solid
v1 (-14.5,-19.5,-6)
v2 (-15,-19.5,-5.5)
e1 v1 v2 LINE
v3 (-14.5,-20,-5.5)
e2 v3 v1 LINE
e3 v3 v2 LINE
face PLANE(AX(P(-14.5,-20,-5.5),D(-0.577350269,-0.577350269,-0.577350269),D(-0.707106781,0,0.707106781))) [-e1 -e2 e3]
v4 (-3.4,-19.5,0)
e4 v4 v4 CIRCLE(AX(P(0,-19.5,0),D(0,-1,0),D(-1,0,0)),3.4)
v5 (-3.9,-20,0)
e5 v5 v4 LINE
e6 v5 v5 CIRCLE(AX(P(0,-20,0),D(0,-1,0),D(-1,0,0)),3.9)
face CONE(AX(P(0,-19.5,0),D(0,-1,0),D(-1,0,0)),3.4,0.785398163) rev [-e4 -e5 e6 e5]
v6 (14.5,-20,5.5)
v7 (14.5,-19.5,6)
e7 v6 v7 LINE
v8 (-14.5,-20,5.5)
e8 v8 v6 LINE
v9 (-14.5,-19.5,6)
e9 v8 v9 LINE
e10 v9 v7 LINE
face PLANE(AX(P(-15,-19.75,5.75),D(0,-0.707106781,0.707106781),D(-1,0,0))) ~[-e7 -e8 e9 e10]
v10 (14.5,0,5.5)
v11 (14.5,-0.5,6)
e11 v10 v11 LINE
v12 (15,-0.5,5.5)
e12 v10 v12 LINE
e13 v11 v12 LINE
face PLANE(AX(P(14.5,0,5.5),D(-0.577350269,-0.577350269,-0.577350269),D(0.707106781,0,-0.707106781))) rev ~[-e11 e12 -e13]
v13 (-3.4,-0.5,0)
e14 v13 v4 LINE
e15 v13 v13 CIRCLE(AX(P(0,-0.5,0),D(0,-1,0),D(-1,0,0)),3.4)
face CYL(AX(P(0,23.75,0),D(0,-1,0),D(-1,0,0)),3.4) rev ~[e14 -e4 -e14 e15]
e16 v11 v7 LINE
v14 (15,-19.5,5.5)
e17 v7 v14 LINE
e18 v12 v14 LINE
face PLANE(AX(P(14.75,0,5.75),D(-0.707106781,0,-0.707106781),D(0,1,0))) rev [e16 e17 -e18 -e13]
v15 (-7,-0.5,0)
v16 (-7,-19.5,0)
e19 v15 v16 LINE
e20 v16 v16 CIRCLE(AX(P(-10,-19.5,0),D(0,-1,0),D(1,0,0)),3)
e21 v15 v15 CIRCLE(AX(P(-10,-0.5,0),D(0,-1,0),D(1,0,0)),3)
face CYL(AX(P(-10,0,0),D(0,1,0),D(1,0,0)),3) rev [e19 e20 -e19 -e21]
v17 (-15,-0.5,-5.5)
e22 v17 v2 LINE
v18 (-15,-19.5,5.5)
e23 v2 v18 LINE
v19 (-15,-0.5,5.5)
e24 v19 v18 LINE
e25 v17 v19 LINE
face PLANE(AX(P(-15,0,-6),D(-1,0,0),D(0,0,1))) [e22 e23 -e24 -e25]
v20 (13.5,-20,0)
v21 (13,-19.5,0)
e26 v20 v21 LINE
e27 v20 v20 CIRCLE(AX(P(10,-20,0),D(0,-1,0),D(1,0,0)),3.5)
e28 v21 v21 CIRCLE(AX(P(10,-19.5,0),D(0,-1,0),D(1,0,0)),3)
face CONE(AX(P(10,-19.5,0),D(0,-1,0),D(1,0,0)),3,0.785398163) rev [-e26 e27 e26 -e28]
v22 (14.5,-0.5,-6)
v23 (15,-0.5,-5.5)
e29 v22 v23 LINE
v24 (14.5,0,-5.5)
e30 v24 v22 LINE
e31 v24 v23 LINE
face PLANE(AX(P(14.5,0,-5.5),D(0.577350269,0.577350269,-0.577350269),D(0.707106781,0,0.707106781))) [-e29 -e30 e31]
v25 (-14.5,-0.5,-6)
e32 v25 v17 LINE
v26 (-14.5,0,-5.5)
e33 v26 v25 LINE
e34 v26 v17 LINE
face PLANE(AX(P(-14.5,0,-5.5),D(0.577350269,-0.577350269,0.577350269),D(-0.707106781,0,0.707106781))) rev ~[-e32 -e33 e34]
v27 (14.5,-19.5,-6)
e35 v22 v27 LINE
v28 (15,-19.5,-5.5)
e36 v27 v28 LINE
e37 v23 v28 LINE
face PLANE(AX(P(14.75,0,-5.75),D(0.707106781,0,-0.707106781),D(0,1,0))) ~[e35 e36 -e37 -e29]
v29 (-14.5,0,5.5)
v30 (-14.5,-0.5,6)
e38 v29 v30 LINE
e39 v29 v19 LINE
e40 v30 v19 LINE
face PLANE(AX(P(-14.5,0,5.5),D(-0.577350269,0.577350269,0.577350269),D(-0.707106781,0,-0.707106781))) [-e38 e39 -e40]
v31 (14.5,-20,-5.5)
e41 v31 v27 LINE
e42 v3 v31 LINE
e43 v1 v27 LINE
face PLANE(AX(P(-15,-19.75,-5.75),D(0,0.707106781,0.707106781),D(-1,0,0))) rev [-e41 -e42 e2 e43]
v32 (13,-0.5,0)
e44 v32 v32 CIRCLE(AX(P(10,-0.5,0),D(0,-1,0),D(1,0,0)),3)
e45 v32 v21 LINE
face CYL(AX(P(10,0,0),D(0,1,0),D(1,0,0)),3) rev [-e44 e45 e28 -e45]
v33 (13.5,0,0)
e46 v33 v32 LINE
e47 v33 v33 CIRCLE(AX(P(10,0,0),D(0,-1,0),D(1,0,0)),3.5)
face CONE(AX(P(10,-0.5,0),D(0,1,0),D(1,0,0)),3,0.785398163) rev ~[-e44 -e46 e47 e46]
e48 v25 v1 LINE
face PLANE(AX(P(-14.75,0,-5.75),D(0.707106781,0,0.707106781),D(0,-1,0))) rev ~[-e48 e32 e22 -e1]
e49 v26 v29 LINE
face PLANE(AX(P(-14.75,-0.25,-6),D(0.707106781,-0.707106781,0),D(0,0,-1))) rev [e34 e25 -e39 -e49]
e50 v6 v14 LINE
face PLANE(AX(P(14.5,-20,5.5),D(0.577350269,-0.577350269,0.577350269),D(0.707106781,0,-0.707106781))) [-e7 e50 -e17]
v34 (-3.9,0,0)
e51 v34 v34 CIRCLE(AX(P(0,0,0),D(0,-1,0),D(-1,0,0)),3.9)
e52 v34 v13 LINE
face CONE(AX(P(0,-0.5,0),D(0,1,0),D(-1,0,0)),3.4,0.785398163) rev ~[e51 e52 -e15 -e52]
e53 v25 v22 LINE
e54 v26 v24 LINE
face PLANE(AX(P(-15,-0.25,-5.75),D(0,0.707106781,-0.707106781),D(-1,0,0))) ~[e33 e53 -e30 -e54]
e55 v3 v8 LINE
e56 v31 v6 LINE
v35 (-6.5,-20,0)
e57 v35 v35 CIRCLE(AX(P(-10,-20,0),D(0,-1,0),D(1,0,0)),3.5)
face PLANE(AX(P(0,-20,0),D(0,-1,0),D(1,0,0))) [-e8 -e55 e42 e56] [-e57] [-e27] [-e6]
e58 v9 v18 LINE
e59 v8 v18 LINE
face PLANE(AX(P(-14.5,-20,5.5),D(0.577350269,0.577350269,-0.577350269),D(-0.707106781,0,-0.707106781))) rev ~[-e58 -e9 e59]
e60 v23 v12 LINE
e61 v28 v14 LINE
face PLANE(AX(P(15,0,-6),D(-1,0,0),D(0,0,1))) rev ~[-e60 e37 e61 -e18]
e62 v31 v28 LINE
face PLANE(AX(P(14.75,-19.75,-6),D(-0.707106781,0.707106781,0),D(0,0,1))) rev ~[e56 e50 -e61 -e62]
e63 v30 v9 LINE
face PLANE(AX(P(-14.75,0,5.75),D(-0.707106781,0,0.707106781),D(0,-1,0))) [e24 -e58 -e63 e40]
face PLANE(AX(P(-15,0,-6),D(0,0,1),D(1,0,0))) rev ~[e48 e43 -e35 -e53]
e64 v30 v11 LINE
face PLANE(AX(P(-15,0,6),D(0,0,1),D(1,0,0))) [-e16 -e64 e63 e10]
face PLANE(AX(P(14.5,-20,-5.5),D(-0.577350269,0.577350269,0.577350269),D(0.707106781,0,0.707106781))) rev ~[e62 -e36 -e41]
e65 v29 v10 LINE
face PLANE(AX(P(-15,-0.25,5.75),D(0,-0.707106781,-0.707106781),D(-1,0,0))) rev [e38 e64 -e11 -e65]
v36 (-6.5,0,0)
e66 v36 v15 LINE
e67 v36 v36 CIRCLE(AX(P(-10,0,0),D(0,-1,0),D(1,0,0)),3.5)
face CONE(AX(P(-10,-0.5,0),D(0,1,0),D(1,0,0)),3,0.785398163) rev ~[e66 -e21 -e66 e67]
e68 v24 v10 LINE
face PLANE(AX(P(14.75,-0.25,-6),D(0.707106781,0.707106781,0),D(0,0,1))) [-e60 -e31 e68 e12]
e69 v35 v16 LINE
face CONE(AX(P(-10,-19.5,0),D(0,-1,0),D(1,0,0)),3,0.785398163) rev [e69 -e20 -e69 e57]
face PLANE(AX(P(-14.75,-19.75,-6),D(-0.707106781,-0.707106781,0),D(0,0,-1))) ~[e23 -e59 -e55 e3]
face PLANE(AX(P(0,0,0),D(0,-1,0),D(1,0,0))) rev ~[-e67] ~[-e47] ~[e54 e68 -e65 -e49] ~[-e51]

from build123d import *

# Parameters (mm, degrees)
F0_W     = 30
F0_H     = 12
F0_R     = 3
F0_R_2   = 3.4
F1_DEPTH = 20
F2_D     = 6.8
F2_DEPTH = 23.75
F2_TIP   = 2.0429261047
F3_SIZE  = 0.5


with BuildPart() as f1:
    # F0 (on Front) → F1 (new body)
    with BuildSketch(Plane.XZ):
        Rectangle(F0_W, F0_H)
        with Locations((-10, 0)):
            Circle(F0_R, mode=Mode.SUBTRACT)
        Circle(F0_R_2, mode=Mode.SUBTRACT)
        with Locations((10, 0)):
            Circle(F0_R, mode=Mode.SUBTRACT)
        Circle(F0_R_2)
    extrude(amount=F1_DEPTH)

    # F2
    with Locations(Plane(origin=(0, 0, 0), x_dir=(1, 0, 0), z_dir=(0, 1, 0))):
        with Locations((0, 0)):
            Hole(F2_D / 2, depth=F2_DEPTH)
            with Locations((0, 0, -(F2_DEPTH + F2_TIP / 2))):  # 118° drill point
                Cone(0, F2_D / 2, F2_TIP, mode=Mode.SUBTRACT)

    # F3
    f3_edges = [f1.edges().sort_by_distance(p)[0] for p in [
        (15, -10, 6),
        (-15, -10, 6),
        (0, 0, 6),
        (0, -20, 6),
        (-15, -10, -6),
        (15, -10, -6),
        (0, 0, -6),
        (0, -20, -6),
        (-15, 0, 0),
        (-15, -20, 0),
        (15, 0, 0),
        (15, -20, 0),
        (-7, -10, 0),
        (-13, 0, 0),
        (-13, -20, 0),
        (-3.4, 0, 0),
        (3.4, -10, 0),
        (-3.4, -20, 0),
        (13, -10, 0),
        (7, 0, 0),
        (7, -20, 0),
    ]]
    chamfer(f3_edges, length=F3_SIZE)


solid = f1.part
